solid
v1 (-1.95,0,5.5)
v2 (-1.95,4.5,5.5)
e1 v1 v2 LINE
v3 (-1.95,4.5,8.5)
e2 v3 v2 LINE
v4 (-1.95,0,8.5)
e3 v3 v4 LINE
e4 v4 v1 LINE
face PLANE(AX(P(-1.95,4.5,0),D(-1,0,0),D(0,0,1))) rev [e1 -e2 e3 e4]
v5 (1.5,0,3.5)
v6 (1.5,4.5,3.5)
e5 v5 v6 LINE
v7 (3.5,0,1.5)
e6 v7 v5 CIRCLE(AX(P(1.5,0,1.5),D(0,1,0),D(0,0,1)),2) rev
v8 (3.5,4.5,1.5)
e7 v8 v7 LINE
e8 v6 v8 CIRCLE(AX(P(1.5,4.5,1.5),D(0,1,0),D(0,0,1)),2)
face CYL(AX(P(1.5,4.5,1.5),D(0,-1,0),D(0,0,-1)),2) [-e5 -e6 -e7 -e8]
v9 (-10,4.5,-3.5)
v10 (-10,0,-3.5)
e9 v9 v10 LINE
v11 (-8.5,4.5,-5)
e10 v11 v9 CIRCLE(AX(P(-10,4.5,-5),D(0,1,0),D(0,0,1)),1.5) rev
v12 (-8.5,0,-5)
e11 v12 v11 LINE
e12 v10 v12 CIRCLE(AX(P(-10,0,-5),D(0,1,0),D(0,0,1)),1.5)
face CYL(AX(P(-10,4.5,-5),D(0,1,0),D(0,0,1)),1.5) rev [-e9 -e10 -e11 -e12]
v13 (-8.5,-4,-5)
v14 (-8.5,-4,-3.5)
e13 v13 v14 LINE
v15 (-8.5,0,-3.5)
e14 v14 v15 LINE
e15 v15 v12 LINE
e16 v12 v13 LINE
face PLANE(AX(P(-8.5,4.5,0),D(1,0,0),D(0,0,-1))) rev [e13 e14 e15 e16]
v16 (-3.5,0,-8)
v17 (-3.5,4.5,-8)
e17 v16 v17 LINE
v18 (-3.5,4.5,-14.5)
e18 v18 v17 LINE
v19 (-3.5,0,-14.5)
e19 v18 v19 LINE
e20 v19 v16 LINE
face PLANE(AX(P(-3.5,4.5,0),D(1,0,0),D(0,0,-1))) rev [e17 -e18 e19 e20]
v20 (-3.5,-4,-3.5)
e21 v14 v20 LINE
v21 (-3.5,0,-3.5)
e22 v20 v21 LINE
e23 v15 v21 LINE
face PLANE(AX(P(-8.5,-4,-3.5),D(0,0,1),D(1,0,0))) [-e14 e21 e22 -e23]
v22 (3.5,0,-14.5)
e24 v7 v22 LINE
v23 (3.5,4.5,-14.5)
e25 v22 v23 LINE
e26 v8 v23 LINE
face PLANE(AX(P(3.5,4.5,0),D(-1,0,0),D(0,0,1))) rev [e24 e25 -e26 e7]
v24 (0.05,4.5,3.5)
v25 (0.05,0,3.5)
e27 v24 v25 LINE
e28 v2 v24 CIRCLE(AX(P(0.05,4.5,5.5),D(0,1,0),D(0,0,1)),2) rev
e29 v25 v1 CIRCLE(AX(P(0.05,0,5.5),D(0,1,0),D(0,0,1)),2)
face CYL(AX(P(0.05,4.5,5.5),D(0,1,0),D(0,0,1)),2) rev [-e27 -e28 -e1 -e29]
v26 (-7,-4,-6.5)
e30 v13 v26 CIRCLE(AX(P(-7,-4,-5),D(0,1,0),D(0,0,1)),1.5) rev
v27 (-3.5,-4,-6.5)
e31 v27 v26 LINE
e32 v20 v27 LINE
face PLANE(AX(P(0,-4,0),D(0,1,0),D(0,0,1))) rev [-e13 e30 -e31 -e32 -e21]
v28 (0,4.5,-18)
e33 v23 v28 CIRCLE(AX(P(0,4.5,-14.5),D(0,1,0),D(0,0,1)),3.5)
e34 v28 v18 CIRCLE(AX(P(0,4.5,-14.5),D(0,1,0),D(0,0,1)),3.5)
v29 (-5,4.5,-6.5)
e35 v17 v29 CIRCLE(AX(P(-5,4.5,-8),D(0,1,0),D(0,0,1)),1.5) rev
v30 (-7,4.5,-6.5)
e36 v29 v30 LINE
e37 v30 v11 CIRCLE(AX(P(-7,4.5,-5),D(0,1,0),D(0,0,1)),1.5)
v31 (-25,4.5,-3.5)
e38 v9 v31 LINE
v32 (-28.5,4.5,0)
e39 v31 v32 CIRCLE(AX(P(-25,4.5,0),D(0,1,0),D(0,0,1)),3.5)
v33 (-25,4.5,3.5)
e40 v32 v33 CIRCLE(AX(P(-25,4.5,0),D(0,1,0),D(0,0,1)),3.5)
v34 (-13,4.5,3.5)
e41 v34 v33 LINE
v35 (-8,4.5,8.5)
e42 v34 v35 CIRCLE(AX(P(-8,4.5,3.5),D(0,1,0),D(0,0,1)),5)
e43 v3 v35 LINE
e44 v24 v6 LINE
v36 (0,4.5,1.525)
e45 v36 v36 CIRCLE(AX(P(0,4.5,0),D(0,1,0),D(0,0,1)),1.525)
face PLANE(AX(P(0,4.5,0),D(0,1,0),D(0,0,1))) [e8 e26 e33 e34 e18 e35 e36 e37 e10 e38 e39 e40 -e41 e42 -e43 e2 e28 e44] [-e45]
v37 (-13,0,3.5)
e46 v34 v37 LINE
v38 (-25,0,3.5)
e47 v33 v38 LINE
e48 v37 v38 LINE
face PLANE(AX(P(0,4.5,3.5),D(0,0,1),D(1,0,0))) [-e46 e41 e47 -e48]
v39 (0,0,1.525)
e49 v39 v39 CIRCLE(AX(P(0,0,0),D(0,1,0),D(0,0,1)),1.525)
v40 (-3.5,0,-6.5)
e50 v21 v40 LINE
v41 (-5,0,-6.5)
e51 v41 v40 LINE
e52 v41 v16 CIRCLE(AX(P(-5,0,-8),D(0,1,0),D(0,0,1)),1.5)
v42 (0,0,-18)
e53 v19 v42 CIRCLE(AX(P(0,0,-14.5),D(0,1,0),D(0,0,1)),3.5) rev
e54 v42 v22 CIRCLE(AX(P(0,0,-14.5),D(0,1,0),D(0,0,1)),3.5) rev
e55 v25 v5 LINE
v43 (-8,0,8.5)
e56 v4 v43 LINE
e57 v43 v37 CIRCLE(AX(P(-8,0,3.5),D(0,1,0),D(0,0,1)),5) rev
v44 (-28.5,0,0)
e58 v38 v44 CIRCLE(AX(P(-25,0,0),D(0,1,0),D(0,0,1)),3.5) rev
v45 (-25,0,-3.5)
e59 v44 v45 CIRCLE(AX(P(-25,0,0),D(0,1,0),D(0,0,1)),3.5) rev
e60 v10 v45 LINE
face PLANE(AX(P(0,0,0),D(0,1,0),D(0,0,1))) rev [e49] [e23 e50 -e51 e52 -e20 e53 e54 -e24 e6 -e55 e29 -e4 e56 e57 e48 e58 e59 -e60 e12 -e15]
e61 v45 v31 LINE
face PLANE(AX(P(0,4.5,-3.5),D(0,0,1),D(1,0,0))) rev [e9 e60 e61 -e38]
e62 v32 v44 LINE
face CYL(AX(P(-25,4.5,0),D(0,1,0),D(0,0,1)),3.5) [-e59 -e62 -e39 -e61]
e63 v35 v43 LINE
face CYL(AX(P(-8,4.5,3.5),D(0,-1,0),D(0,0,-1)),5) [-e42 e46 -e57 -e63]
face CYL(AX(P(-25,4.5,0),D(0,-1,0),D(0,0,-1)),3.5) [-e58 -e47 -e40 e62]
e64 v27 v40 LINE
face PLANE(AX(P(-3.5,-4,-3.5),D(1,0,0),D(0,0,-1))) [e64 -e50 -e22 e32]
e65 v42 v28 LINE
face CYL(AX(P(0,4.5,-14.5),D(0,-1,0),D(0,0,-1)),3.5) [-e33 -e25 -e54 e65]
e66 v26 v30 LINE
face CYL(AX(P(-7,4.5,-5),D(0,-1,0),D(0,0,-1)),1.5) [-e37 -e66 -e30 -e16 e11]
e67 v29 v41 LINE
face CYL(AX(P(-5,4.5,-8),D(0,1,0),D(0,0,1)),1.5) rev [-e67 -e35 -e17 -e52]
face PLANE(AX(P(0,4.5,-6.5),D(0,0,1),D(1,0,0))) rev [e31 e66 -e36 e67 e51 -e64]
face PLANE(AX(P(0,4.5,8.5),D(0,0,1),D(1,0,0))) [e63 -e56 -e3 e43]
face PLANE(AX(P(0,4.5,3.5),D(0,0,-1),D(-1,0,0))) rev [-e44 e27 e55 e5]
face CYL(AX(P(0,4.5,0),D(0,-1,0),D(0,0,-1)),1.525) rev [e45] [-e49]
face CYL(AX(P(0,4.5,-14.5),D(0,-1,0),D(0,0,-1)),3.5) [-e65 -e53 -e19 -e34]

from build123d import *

# Parameters (mm, degrees)
SKETCH_1_R      = 1.525
EXTRUDE_1_DEPTH = 4.5
SKETCH_2_W      = 5
SKETCH_2_H      = 3
EXTRUDE_2_DEPTH = 4
FILLET_1_R      = 3.5
FILLET_3_R      = 1.5
FILLET_4_R      = 5
FILLET_5_R      = 2


with BuildPart() as part:
    # 草图1 → 凸台-拉伸1 (new body)
    with BuildSketch(Plane(origin=(0, 0, 0), x_dir=(1, 0, 0), z_dir=(0, 1, 0))):
        Polygon((3.5, -3.5), (3.5, 18), (-3.5, 18), (-3.5, 6.5), (-8.5, 6.5), (-8.5, 3.5), (-28.5, 3.5), (-28.5, -3.5), (-13, -3.5), (-13, -8.5), (-7.55, -8.5), (-1.95, -8.5), (-1.95, -3.5), align=None)
        with Locations(Location((0, 0, 0), (0, 0, 270))):
            Circle(SKETCH_1_R, mode=Mode.SUBTRACT)
    extrude(amount=EXTRUDE_1_DEPTH)

    # 草图2 → 凸台-拉伸2 (add)
    with BuildSketch(Plane(origin=(0, 0, 0), x_dir=(1, 0, 0), z_dir=(0, 1, 0))):
        with Locations((-6, 5)):
            Rectangle(SKETCH_2_W, SKETCH_2_H)
    extrude(amount=-EXTRUDE_2_DEPTH)

    # 圆角1
    fillet_1_edges = [part.edges().sort_by_distance(p)[0] for p in [
        (3.5, 2.25, -18),
        (-3.5, 2.25, -18),
        (-28.5, 2.25, 3.5),
        (-28.5, 2.25, -3.5),
    ]]
    fillet(fillet_1_edges, radius=FILLET_1_R - 0.0001)  # a hair under: the kernel refuses the full size

    # 圆角3
    fillet_3_edges = [part.edges().sort_by_distance(p)[0] for p in [
        (-8.5, 2.25, -3.5),
        (-8.5, 0.25, -6.5),
        (-3.5, 2.25, -6.5),
    ]]
    fillet(fillet_3_edges, radius=FILLET_3_R - 0.0001)  # a hair under: the kernel refuses the full size

    # 圆角4
    fillet_4_edges = [part.edges().sort_by_distance(p)[0] for p in [
        (-13, 2.25, 8.5),
    ]]
    fillet(fillet_4_edges, radius=FILLET_4_R - 0.0001)  # a hair under: the kernel refuses the full size

    # 圆角5
    fillet_5_edges = [part.edges().sort_by_distance(p)[0] for p in [
        (3.5, 2.25, 3.5),
        (-1.95, 2.25, 3.5),
    ]]
    fillet(fillet_5_edges, radius=FILLET_5_R)


solid = part.part
